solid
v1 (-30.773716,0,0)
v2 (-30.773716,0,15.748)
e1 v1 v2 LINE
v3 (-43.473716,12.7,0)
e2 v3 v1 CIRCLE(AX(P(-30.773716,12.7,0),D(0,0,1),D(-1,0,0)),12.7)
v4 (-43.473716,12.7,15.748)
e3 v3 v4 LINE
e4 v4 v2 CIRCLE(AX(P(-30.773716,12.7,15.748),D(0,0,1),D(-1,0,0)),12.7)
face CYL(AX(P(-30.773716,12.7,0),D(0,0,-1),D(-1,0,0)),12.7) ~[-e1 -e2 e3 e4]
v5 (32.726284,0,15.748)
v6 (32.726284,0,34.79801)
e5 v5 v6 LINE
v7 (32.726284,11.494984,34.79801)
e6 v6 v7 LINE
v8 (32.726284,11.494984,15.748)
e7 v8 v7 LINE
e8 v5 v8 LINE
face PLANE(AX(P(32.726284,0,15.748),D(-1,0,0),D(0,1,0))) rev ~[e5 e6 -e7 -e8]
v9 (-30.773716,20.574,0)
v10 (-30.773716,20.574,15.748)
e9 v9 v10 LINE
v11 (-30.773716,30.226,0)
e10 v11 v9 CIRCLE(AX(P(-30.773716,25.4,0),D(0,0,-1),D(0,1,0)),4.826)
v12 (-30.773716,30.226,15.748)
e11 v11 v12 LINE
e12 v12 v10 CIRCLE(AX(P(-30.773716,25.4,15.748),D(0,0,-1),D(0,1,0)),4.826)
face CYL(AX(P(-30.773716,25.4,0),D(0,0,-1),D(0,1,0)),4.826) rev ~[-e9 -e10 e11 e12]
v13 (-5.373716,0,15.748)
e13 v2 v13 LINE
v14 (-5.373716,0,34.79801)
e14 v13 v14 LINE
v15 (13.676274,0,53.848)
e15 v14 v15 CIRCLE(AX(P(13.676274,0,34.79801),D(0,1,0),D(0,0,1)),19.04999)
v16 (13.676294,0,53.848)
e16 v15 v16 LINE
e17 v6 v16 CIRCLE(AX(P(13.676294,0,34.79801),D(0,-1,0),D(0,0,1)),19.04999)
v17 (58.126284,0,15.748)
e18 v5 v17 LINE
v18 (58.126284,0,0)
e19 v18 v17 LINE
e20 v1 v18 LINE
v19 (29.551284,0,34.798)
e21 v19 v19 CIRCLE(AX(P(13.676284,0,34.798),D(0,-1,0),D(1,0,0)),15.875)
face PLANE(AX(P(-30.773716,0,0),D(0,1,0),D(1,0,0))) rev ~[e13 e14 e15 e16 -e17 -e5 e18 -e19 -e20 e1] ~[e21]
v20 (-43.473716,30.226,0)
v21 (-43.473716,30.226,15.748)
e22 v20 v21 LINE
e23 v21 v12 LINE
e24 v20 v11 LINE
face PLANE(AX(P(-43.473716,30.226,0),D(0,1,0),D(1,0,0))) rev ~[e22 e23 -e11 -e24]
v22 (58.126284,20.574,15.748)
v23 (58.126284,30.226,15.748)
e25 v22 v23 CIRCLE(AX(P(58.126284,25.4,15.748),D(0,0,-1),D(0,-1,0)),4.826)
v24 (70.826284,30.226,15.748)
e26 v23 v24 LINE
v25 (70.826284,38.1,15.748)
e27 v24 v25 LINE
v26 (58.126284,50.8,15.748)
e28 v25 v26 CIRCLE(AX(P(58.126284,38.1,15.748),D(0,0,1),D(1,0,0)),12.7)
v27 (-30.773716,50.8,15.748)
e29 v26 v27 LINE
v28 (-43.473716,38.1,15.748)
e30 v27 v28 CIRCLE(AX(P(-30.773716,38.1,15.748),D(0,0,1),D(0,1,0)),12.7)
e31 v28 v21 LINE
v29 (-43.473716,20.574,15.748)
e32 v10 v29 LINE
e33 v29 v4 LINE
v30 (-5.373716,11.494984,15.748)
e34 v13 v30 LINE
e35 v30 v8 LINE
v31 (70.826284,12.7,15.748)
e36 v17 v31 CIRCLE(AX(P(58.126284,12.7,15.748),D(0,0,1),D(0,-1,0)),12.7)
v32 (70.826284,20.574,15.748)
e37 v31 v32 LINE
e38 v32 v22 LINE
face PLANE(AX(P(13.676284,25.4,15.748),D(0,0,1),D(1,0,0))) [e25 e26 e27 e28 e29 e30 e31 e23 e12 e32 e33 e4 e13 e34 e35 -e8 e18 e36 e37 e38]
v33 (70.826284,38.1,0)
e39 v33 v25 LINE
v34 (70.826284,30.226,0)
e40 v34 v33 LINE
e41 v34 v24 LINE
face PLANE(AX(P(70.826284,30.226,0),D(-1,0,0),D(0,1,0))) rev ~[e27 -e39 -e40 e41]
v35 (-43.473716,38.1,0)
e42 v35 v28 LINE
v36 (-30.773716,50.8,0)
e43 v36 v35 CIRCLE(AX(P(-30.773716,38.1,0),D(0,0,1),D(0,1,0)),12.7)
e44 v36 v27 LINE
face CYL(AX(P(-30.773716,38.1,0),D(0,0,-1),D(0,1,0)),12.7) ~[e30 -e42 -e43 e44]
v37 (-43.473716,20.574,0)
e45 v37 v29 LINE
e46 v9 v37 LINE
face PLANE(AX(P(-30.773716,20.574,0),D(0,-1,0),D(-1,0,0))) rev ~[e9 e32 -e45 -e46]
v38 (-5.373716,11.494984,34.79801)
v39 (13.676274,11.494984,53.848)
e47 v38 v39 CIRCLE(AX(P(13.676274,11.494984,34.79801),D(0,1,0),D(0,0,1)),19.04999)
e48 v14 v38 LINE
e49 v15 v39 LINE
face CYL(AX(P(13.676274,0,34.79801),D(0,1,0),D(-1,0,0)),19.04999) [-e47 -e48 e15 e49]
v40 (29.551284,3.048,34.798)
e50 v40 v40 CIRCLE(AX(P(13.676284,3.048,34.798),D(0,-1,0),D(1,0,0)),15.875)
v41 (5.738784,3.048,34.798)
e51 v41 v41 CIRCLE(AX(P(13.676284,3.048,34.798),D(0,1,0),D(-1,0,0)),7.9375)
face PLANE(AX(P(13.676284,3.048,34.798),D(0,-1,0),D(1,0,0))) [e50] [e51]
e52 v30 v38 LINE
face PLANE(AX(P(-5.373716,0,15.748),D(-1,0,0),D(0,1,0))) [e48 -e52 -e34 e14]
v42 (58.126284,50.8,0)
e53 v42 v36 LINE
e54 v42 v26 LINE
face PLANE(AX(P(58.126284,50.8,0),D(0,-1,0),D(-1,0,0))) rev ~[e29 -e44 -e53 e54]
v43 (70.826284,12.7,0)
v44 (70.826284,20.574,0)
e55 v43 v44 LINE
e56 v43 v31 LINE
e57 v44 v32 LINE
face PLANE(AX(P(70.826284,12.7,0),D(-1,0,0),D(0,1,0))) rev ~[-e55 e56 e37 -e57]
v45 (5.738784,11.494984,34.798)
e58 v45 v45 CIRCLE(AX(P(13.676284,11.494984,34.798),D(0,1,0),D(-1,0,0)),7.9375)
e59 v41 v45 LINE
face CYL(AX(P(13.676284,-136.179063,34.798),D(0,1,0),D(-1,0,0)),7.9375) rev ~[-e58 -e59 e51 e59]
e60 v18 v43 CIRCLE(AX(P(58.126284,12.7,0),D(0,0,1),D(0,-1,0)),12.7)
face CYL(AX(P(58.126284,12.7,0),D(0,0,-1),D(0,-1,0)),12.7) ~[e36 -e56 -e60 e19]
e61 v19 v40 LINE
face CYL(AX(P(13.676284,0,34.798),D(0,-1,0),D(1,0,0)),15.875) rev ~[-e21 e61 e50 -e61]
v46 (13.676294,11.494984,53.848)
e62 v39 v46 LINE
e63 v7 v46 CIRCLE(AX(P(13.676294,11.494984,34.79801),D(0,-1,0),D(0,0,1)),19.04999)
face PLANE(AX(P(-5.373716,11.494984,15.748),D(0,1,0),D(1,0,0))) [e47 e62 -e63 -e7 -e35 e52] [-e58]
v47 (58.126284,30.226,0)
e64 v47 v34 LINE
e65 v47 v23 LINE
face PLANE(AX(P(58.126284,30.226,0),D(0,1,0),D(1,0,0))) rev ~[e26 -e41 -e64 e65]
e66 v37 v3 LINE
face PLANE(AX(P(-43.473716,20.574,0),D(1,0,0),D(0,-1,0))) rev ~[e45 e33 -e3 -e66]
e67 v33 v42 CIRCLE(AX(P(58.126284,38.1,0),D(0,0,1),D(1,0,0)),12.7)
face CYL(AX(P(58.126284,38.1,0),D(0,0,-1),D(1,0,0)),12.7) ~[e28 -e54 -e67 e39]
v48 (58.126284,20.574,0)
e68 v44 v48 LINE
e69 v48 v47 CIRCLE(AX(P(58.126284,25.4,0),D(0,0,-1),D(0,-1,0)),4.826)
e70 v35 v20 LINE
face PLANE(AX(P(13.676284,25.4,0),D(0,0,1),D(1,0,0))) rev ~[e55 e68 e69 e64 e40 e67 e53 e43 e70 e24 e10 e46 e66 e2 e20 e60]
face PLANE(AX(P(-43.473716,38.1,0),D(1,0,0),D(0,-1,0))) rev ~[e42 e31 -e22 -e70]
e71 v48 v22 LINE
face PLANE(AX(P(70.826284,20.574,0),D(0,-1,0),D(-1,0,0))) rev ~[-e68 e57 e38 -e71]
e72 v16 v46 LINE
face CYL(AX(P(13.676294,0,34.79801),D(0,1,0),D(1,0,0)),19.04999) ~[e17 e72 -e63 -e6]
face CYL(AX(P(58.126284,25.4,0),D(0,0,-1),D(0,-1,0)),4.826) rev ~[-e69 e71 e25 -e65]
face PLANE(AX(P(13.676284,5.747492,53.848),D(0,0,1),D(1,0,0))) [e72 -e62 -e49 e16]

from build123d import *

# Parameters (mm, degrees)
F1_DEPTH = 15.748
F2_W     = 38.1
F2_H     = 11.4949838928
F3_DEPTH = 38.1
F4_R     = 19.04999
F6_D     = 15.875
F7_R     = 15.875
F7_R_2   = 7.9375
F8_DEPTH = 3.048


# Not quite as in the source:
# - a fillet or chamfer is up to 0.001 mm smaller than in the source, because OpenCascade refuses the exact size


with BuildPart() as f1:
    # F0 (on Top) → F1 (new body)
    with BuildSketch(Plane.XY):
        with BuildLine():
            Line((-30.7737162879, 0), (58.1262837121, 0))
            ThreePointArc((58.1262837121, 0), (67.1065398331, 3.7197438789), (70.8262837121, 12.7))
            Line((70.8262837121, 12.7), (70.8262837121, 20.574))
            Line((70.8262837121, 20.574), (58.1262837121, 20.574))
            ThreePointArc((58.1262837121, 20.574), (53.3002837121, 25.4), (58.1262837121, 30.226))
            Line((58.1262837121, 30.226), (70.8262837121, 30.226))
            Line((70.8262837121, 30.226), (70.8262837121, 38.1))
            ThreePointArc((70.8262837121, 38.1), (67.1065398331, 47.0802561211), (58.1262837121, 50.8))
            Line((58.1262837121, 50.8), (-30.7737162879, 50.8))
            ThreePointArc((-30.7737162879, 50.8), (-39.753972409, 47.0802561211), (-43.4737162879, 38.1))
            Line((-43.4737162879, 38.1), (-43.4737162879, 30.226))
            Line((-43.4737162879, 30.226), (-30.7737162879, 30.226))
            ThreePointArc((-30.7737162879, 30.226), (-25.9477162879, 25.4), (-30.7737162879, 20.574))
            Line((-30.7737162879, 20.574), (-43.4737162879, 20.574))
            Line((-43.4737162879, 20.574), (-43.4737162879, 12.7))
            ThreePointArc((-43.4737162879, 12.7), (-39.753972409, 3.7197438789), (-30.7737162879, 0))
        make_face()
    extrude(amount=F1_DEPTH)

    # F2 (on face) → F3 (join)
    with BuildSketch(Plane.XY.offset(15.748)):
        with Locations((13.6762837121, 5.7474919464)):
            Rectangle(F2_W, F2_H)
    extrude(amount=F3_DEPTH)

    # F4 (radius 19.05 in the source; OpenCascade refuses exactly that, so slightly less here)
    f4_edges = [f1.edges().sort_by_distance(p)[0] for p in [
        (-5.373716, 5.747492, 53.848),
        (32.726284, 5.747492, 53.848),
    ]]
    fillet(f4_edges, radius=F4_R)

    # F6 (through all)
    with Locations(Plane.XZ):
        with Locations((13.6762837121, 34.798)):
            Hole(F6_D / 2)

    # F7 (on face) → F8 (cut)
    with BuildSketch(Plane.XZ):
        with Locations((13.6762837121, 34.798)):
            Circle(F7_R)
        with Locations((13.6762837121, 34.798)):
            Circle(F7_R_2, mode=Mode.SUBTRACT)
    extrude(amount=-F8_DEPTH, mode=Mode.SUBTRACT)


solid = f1.part
